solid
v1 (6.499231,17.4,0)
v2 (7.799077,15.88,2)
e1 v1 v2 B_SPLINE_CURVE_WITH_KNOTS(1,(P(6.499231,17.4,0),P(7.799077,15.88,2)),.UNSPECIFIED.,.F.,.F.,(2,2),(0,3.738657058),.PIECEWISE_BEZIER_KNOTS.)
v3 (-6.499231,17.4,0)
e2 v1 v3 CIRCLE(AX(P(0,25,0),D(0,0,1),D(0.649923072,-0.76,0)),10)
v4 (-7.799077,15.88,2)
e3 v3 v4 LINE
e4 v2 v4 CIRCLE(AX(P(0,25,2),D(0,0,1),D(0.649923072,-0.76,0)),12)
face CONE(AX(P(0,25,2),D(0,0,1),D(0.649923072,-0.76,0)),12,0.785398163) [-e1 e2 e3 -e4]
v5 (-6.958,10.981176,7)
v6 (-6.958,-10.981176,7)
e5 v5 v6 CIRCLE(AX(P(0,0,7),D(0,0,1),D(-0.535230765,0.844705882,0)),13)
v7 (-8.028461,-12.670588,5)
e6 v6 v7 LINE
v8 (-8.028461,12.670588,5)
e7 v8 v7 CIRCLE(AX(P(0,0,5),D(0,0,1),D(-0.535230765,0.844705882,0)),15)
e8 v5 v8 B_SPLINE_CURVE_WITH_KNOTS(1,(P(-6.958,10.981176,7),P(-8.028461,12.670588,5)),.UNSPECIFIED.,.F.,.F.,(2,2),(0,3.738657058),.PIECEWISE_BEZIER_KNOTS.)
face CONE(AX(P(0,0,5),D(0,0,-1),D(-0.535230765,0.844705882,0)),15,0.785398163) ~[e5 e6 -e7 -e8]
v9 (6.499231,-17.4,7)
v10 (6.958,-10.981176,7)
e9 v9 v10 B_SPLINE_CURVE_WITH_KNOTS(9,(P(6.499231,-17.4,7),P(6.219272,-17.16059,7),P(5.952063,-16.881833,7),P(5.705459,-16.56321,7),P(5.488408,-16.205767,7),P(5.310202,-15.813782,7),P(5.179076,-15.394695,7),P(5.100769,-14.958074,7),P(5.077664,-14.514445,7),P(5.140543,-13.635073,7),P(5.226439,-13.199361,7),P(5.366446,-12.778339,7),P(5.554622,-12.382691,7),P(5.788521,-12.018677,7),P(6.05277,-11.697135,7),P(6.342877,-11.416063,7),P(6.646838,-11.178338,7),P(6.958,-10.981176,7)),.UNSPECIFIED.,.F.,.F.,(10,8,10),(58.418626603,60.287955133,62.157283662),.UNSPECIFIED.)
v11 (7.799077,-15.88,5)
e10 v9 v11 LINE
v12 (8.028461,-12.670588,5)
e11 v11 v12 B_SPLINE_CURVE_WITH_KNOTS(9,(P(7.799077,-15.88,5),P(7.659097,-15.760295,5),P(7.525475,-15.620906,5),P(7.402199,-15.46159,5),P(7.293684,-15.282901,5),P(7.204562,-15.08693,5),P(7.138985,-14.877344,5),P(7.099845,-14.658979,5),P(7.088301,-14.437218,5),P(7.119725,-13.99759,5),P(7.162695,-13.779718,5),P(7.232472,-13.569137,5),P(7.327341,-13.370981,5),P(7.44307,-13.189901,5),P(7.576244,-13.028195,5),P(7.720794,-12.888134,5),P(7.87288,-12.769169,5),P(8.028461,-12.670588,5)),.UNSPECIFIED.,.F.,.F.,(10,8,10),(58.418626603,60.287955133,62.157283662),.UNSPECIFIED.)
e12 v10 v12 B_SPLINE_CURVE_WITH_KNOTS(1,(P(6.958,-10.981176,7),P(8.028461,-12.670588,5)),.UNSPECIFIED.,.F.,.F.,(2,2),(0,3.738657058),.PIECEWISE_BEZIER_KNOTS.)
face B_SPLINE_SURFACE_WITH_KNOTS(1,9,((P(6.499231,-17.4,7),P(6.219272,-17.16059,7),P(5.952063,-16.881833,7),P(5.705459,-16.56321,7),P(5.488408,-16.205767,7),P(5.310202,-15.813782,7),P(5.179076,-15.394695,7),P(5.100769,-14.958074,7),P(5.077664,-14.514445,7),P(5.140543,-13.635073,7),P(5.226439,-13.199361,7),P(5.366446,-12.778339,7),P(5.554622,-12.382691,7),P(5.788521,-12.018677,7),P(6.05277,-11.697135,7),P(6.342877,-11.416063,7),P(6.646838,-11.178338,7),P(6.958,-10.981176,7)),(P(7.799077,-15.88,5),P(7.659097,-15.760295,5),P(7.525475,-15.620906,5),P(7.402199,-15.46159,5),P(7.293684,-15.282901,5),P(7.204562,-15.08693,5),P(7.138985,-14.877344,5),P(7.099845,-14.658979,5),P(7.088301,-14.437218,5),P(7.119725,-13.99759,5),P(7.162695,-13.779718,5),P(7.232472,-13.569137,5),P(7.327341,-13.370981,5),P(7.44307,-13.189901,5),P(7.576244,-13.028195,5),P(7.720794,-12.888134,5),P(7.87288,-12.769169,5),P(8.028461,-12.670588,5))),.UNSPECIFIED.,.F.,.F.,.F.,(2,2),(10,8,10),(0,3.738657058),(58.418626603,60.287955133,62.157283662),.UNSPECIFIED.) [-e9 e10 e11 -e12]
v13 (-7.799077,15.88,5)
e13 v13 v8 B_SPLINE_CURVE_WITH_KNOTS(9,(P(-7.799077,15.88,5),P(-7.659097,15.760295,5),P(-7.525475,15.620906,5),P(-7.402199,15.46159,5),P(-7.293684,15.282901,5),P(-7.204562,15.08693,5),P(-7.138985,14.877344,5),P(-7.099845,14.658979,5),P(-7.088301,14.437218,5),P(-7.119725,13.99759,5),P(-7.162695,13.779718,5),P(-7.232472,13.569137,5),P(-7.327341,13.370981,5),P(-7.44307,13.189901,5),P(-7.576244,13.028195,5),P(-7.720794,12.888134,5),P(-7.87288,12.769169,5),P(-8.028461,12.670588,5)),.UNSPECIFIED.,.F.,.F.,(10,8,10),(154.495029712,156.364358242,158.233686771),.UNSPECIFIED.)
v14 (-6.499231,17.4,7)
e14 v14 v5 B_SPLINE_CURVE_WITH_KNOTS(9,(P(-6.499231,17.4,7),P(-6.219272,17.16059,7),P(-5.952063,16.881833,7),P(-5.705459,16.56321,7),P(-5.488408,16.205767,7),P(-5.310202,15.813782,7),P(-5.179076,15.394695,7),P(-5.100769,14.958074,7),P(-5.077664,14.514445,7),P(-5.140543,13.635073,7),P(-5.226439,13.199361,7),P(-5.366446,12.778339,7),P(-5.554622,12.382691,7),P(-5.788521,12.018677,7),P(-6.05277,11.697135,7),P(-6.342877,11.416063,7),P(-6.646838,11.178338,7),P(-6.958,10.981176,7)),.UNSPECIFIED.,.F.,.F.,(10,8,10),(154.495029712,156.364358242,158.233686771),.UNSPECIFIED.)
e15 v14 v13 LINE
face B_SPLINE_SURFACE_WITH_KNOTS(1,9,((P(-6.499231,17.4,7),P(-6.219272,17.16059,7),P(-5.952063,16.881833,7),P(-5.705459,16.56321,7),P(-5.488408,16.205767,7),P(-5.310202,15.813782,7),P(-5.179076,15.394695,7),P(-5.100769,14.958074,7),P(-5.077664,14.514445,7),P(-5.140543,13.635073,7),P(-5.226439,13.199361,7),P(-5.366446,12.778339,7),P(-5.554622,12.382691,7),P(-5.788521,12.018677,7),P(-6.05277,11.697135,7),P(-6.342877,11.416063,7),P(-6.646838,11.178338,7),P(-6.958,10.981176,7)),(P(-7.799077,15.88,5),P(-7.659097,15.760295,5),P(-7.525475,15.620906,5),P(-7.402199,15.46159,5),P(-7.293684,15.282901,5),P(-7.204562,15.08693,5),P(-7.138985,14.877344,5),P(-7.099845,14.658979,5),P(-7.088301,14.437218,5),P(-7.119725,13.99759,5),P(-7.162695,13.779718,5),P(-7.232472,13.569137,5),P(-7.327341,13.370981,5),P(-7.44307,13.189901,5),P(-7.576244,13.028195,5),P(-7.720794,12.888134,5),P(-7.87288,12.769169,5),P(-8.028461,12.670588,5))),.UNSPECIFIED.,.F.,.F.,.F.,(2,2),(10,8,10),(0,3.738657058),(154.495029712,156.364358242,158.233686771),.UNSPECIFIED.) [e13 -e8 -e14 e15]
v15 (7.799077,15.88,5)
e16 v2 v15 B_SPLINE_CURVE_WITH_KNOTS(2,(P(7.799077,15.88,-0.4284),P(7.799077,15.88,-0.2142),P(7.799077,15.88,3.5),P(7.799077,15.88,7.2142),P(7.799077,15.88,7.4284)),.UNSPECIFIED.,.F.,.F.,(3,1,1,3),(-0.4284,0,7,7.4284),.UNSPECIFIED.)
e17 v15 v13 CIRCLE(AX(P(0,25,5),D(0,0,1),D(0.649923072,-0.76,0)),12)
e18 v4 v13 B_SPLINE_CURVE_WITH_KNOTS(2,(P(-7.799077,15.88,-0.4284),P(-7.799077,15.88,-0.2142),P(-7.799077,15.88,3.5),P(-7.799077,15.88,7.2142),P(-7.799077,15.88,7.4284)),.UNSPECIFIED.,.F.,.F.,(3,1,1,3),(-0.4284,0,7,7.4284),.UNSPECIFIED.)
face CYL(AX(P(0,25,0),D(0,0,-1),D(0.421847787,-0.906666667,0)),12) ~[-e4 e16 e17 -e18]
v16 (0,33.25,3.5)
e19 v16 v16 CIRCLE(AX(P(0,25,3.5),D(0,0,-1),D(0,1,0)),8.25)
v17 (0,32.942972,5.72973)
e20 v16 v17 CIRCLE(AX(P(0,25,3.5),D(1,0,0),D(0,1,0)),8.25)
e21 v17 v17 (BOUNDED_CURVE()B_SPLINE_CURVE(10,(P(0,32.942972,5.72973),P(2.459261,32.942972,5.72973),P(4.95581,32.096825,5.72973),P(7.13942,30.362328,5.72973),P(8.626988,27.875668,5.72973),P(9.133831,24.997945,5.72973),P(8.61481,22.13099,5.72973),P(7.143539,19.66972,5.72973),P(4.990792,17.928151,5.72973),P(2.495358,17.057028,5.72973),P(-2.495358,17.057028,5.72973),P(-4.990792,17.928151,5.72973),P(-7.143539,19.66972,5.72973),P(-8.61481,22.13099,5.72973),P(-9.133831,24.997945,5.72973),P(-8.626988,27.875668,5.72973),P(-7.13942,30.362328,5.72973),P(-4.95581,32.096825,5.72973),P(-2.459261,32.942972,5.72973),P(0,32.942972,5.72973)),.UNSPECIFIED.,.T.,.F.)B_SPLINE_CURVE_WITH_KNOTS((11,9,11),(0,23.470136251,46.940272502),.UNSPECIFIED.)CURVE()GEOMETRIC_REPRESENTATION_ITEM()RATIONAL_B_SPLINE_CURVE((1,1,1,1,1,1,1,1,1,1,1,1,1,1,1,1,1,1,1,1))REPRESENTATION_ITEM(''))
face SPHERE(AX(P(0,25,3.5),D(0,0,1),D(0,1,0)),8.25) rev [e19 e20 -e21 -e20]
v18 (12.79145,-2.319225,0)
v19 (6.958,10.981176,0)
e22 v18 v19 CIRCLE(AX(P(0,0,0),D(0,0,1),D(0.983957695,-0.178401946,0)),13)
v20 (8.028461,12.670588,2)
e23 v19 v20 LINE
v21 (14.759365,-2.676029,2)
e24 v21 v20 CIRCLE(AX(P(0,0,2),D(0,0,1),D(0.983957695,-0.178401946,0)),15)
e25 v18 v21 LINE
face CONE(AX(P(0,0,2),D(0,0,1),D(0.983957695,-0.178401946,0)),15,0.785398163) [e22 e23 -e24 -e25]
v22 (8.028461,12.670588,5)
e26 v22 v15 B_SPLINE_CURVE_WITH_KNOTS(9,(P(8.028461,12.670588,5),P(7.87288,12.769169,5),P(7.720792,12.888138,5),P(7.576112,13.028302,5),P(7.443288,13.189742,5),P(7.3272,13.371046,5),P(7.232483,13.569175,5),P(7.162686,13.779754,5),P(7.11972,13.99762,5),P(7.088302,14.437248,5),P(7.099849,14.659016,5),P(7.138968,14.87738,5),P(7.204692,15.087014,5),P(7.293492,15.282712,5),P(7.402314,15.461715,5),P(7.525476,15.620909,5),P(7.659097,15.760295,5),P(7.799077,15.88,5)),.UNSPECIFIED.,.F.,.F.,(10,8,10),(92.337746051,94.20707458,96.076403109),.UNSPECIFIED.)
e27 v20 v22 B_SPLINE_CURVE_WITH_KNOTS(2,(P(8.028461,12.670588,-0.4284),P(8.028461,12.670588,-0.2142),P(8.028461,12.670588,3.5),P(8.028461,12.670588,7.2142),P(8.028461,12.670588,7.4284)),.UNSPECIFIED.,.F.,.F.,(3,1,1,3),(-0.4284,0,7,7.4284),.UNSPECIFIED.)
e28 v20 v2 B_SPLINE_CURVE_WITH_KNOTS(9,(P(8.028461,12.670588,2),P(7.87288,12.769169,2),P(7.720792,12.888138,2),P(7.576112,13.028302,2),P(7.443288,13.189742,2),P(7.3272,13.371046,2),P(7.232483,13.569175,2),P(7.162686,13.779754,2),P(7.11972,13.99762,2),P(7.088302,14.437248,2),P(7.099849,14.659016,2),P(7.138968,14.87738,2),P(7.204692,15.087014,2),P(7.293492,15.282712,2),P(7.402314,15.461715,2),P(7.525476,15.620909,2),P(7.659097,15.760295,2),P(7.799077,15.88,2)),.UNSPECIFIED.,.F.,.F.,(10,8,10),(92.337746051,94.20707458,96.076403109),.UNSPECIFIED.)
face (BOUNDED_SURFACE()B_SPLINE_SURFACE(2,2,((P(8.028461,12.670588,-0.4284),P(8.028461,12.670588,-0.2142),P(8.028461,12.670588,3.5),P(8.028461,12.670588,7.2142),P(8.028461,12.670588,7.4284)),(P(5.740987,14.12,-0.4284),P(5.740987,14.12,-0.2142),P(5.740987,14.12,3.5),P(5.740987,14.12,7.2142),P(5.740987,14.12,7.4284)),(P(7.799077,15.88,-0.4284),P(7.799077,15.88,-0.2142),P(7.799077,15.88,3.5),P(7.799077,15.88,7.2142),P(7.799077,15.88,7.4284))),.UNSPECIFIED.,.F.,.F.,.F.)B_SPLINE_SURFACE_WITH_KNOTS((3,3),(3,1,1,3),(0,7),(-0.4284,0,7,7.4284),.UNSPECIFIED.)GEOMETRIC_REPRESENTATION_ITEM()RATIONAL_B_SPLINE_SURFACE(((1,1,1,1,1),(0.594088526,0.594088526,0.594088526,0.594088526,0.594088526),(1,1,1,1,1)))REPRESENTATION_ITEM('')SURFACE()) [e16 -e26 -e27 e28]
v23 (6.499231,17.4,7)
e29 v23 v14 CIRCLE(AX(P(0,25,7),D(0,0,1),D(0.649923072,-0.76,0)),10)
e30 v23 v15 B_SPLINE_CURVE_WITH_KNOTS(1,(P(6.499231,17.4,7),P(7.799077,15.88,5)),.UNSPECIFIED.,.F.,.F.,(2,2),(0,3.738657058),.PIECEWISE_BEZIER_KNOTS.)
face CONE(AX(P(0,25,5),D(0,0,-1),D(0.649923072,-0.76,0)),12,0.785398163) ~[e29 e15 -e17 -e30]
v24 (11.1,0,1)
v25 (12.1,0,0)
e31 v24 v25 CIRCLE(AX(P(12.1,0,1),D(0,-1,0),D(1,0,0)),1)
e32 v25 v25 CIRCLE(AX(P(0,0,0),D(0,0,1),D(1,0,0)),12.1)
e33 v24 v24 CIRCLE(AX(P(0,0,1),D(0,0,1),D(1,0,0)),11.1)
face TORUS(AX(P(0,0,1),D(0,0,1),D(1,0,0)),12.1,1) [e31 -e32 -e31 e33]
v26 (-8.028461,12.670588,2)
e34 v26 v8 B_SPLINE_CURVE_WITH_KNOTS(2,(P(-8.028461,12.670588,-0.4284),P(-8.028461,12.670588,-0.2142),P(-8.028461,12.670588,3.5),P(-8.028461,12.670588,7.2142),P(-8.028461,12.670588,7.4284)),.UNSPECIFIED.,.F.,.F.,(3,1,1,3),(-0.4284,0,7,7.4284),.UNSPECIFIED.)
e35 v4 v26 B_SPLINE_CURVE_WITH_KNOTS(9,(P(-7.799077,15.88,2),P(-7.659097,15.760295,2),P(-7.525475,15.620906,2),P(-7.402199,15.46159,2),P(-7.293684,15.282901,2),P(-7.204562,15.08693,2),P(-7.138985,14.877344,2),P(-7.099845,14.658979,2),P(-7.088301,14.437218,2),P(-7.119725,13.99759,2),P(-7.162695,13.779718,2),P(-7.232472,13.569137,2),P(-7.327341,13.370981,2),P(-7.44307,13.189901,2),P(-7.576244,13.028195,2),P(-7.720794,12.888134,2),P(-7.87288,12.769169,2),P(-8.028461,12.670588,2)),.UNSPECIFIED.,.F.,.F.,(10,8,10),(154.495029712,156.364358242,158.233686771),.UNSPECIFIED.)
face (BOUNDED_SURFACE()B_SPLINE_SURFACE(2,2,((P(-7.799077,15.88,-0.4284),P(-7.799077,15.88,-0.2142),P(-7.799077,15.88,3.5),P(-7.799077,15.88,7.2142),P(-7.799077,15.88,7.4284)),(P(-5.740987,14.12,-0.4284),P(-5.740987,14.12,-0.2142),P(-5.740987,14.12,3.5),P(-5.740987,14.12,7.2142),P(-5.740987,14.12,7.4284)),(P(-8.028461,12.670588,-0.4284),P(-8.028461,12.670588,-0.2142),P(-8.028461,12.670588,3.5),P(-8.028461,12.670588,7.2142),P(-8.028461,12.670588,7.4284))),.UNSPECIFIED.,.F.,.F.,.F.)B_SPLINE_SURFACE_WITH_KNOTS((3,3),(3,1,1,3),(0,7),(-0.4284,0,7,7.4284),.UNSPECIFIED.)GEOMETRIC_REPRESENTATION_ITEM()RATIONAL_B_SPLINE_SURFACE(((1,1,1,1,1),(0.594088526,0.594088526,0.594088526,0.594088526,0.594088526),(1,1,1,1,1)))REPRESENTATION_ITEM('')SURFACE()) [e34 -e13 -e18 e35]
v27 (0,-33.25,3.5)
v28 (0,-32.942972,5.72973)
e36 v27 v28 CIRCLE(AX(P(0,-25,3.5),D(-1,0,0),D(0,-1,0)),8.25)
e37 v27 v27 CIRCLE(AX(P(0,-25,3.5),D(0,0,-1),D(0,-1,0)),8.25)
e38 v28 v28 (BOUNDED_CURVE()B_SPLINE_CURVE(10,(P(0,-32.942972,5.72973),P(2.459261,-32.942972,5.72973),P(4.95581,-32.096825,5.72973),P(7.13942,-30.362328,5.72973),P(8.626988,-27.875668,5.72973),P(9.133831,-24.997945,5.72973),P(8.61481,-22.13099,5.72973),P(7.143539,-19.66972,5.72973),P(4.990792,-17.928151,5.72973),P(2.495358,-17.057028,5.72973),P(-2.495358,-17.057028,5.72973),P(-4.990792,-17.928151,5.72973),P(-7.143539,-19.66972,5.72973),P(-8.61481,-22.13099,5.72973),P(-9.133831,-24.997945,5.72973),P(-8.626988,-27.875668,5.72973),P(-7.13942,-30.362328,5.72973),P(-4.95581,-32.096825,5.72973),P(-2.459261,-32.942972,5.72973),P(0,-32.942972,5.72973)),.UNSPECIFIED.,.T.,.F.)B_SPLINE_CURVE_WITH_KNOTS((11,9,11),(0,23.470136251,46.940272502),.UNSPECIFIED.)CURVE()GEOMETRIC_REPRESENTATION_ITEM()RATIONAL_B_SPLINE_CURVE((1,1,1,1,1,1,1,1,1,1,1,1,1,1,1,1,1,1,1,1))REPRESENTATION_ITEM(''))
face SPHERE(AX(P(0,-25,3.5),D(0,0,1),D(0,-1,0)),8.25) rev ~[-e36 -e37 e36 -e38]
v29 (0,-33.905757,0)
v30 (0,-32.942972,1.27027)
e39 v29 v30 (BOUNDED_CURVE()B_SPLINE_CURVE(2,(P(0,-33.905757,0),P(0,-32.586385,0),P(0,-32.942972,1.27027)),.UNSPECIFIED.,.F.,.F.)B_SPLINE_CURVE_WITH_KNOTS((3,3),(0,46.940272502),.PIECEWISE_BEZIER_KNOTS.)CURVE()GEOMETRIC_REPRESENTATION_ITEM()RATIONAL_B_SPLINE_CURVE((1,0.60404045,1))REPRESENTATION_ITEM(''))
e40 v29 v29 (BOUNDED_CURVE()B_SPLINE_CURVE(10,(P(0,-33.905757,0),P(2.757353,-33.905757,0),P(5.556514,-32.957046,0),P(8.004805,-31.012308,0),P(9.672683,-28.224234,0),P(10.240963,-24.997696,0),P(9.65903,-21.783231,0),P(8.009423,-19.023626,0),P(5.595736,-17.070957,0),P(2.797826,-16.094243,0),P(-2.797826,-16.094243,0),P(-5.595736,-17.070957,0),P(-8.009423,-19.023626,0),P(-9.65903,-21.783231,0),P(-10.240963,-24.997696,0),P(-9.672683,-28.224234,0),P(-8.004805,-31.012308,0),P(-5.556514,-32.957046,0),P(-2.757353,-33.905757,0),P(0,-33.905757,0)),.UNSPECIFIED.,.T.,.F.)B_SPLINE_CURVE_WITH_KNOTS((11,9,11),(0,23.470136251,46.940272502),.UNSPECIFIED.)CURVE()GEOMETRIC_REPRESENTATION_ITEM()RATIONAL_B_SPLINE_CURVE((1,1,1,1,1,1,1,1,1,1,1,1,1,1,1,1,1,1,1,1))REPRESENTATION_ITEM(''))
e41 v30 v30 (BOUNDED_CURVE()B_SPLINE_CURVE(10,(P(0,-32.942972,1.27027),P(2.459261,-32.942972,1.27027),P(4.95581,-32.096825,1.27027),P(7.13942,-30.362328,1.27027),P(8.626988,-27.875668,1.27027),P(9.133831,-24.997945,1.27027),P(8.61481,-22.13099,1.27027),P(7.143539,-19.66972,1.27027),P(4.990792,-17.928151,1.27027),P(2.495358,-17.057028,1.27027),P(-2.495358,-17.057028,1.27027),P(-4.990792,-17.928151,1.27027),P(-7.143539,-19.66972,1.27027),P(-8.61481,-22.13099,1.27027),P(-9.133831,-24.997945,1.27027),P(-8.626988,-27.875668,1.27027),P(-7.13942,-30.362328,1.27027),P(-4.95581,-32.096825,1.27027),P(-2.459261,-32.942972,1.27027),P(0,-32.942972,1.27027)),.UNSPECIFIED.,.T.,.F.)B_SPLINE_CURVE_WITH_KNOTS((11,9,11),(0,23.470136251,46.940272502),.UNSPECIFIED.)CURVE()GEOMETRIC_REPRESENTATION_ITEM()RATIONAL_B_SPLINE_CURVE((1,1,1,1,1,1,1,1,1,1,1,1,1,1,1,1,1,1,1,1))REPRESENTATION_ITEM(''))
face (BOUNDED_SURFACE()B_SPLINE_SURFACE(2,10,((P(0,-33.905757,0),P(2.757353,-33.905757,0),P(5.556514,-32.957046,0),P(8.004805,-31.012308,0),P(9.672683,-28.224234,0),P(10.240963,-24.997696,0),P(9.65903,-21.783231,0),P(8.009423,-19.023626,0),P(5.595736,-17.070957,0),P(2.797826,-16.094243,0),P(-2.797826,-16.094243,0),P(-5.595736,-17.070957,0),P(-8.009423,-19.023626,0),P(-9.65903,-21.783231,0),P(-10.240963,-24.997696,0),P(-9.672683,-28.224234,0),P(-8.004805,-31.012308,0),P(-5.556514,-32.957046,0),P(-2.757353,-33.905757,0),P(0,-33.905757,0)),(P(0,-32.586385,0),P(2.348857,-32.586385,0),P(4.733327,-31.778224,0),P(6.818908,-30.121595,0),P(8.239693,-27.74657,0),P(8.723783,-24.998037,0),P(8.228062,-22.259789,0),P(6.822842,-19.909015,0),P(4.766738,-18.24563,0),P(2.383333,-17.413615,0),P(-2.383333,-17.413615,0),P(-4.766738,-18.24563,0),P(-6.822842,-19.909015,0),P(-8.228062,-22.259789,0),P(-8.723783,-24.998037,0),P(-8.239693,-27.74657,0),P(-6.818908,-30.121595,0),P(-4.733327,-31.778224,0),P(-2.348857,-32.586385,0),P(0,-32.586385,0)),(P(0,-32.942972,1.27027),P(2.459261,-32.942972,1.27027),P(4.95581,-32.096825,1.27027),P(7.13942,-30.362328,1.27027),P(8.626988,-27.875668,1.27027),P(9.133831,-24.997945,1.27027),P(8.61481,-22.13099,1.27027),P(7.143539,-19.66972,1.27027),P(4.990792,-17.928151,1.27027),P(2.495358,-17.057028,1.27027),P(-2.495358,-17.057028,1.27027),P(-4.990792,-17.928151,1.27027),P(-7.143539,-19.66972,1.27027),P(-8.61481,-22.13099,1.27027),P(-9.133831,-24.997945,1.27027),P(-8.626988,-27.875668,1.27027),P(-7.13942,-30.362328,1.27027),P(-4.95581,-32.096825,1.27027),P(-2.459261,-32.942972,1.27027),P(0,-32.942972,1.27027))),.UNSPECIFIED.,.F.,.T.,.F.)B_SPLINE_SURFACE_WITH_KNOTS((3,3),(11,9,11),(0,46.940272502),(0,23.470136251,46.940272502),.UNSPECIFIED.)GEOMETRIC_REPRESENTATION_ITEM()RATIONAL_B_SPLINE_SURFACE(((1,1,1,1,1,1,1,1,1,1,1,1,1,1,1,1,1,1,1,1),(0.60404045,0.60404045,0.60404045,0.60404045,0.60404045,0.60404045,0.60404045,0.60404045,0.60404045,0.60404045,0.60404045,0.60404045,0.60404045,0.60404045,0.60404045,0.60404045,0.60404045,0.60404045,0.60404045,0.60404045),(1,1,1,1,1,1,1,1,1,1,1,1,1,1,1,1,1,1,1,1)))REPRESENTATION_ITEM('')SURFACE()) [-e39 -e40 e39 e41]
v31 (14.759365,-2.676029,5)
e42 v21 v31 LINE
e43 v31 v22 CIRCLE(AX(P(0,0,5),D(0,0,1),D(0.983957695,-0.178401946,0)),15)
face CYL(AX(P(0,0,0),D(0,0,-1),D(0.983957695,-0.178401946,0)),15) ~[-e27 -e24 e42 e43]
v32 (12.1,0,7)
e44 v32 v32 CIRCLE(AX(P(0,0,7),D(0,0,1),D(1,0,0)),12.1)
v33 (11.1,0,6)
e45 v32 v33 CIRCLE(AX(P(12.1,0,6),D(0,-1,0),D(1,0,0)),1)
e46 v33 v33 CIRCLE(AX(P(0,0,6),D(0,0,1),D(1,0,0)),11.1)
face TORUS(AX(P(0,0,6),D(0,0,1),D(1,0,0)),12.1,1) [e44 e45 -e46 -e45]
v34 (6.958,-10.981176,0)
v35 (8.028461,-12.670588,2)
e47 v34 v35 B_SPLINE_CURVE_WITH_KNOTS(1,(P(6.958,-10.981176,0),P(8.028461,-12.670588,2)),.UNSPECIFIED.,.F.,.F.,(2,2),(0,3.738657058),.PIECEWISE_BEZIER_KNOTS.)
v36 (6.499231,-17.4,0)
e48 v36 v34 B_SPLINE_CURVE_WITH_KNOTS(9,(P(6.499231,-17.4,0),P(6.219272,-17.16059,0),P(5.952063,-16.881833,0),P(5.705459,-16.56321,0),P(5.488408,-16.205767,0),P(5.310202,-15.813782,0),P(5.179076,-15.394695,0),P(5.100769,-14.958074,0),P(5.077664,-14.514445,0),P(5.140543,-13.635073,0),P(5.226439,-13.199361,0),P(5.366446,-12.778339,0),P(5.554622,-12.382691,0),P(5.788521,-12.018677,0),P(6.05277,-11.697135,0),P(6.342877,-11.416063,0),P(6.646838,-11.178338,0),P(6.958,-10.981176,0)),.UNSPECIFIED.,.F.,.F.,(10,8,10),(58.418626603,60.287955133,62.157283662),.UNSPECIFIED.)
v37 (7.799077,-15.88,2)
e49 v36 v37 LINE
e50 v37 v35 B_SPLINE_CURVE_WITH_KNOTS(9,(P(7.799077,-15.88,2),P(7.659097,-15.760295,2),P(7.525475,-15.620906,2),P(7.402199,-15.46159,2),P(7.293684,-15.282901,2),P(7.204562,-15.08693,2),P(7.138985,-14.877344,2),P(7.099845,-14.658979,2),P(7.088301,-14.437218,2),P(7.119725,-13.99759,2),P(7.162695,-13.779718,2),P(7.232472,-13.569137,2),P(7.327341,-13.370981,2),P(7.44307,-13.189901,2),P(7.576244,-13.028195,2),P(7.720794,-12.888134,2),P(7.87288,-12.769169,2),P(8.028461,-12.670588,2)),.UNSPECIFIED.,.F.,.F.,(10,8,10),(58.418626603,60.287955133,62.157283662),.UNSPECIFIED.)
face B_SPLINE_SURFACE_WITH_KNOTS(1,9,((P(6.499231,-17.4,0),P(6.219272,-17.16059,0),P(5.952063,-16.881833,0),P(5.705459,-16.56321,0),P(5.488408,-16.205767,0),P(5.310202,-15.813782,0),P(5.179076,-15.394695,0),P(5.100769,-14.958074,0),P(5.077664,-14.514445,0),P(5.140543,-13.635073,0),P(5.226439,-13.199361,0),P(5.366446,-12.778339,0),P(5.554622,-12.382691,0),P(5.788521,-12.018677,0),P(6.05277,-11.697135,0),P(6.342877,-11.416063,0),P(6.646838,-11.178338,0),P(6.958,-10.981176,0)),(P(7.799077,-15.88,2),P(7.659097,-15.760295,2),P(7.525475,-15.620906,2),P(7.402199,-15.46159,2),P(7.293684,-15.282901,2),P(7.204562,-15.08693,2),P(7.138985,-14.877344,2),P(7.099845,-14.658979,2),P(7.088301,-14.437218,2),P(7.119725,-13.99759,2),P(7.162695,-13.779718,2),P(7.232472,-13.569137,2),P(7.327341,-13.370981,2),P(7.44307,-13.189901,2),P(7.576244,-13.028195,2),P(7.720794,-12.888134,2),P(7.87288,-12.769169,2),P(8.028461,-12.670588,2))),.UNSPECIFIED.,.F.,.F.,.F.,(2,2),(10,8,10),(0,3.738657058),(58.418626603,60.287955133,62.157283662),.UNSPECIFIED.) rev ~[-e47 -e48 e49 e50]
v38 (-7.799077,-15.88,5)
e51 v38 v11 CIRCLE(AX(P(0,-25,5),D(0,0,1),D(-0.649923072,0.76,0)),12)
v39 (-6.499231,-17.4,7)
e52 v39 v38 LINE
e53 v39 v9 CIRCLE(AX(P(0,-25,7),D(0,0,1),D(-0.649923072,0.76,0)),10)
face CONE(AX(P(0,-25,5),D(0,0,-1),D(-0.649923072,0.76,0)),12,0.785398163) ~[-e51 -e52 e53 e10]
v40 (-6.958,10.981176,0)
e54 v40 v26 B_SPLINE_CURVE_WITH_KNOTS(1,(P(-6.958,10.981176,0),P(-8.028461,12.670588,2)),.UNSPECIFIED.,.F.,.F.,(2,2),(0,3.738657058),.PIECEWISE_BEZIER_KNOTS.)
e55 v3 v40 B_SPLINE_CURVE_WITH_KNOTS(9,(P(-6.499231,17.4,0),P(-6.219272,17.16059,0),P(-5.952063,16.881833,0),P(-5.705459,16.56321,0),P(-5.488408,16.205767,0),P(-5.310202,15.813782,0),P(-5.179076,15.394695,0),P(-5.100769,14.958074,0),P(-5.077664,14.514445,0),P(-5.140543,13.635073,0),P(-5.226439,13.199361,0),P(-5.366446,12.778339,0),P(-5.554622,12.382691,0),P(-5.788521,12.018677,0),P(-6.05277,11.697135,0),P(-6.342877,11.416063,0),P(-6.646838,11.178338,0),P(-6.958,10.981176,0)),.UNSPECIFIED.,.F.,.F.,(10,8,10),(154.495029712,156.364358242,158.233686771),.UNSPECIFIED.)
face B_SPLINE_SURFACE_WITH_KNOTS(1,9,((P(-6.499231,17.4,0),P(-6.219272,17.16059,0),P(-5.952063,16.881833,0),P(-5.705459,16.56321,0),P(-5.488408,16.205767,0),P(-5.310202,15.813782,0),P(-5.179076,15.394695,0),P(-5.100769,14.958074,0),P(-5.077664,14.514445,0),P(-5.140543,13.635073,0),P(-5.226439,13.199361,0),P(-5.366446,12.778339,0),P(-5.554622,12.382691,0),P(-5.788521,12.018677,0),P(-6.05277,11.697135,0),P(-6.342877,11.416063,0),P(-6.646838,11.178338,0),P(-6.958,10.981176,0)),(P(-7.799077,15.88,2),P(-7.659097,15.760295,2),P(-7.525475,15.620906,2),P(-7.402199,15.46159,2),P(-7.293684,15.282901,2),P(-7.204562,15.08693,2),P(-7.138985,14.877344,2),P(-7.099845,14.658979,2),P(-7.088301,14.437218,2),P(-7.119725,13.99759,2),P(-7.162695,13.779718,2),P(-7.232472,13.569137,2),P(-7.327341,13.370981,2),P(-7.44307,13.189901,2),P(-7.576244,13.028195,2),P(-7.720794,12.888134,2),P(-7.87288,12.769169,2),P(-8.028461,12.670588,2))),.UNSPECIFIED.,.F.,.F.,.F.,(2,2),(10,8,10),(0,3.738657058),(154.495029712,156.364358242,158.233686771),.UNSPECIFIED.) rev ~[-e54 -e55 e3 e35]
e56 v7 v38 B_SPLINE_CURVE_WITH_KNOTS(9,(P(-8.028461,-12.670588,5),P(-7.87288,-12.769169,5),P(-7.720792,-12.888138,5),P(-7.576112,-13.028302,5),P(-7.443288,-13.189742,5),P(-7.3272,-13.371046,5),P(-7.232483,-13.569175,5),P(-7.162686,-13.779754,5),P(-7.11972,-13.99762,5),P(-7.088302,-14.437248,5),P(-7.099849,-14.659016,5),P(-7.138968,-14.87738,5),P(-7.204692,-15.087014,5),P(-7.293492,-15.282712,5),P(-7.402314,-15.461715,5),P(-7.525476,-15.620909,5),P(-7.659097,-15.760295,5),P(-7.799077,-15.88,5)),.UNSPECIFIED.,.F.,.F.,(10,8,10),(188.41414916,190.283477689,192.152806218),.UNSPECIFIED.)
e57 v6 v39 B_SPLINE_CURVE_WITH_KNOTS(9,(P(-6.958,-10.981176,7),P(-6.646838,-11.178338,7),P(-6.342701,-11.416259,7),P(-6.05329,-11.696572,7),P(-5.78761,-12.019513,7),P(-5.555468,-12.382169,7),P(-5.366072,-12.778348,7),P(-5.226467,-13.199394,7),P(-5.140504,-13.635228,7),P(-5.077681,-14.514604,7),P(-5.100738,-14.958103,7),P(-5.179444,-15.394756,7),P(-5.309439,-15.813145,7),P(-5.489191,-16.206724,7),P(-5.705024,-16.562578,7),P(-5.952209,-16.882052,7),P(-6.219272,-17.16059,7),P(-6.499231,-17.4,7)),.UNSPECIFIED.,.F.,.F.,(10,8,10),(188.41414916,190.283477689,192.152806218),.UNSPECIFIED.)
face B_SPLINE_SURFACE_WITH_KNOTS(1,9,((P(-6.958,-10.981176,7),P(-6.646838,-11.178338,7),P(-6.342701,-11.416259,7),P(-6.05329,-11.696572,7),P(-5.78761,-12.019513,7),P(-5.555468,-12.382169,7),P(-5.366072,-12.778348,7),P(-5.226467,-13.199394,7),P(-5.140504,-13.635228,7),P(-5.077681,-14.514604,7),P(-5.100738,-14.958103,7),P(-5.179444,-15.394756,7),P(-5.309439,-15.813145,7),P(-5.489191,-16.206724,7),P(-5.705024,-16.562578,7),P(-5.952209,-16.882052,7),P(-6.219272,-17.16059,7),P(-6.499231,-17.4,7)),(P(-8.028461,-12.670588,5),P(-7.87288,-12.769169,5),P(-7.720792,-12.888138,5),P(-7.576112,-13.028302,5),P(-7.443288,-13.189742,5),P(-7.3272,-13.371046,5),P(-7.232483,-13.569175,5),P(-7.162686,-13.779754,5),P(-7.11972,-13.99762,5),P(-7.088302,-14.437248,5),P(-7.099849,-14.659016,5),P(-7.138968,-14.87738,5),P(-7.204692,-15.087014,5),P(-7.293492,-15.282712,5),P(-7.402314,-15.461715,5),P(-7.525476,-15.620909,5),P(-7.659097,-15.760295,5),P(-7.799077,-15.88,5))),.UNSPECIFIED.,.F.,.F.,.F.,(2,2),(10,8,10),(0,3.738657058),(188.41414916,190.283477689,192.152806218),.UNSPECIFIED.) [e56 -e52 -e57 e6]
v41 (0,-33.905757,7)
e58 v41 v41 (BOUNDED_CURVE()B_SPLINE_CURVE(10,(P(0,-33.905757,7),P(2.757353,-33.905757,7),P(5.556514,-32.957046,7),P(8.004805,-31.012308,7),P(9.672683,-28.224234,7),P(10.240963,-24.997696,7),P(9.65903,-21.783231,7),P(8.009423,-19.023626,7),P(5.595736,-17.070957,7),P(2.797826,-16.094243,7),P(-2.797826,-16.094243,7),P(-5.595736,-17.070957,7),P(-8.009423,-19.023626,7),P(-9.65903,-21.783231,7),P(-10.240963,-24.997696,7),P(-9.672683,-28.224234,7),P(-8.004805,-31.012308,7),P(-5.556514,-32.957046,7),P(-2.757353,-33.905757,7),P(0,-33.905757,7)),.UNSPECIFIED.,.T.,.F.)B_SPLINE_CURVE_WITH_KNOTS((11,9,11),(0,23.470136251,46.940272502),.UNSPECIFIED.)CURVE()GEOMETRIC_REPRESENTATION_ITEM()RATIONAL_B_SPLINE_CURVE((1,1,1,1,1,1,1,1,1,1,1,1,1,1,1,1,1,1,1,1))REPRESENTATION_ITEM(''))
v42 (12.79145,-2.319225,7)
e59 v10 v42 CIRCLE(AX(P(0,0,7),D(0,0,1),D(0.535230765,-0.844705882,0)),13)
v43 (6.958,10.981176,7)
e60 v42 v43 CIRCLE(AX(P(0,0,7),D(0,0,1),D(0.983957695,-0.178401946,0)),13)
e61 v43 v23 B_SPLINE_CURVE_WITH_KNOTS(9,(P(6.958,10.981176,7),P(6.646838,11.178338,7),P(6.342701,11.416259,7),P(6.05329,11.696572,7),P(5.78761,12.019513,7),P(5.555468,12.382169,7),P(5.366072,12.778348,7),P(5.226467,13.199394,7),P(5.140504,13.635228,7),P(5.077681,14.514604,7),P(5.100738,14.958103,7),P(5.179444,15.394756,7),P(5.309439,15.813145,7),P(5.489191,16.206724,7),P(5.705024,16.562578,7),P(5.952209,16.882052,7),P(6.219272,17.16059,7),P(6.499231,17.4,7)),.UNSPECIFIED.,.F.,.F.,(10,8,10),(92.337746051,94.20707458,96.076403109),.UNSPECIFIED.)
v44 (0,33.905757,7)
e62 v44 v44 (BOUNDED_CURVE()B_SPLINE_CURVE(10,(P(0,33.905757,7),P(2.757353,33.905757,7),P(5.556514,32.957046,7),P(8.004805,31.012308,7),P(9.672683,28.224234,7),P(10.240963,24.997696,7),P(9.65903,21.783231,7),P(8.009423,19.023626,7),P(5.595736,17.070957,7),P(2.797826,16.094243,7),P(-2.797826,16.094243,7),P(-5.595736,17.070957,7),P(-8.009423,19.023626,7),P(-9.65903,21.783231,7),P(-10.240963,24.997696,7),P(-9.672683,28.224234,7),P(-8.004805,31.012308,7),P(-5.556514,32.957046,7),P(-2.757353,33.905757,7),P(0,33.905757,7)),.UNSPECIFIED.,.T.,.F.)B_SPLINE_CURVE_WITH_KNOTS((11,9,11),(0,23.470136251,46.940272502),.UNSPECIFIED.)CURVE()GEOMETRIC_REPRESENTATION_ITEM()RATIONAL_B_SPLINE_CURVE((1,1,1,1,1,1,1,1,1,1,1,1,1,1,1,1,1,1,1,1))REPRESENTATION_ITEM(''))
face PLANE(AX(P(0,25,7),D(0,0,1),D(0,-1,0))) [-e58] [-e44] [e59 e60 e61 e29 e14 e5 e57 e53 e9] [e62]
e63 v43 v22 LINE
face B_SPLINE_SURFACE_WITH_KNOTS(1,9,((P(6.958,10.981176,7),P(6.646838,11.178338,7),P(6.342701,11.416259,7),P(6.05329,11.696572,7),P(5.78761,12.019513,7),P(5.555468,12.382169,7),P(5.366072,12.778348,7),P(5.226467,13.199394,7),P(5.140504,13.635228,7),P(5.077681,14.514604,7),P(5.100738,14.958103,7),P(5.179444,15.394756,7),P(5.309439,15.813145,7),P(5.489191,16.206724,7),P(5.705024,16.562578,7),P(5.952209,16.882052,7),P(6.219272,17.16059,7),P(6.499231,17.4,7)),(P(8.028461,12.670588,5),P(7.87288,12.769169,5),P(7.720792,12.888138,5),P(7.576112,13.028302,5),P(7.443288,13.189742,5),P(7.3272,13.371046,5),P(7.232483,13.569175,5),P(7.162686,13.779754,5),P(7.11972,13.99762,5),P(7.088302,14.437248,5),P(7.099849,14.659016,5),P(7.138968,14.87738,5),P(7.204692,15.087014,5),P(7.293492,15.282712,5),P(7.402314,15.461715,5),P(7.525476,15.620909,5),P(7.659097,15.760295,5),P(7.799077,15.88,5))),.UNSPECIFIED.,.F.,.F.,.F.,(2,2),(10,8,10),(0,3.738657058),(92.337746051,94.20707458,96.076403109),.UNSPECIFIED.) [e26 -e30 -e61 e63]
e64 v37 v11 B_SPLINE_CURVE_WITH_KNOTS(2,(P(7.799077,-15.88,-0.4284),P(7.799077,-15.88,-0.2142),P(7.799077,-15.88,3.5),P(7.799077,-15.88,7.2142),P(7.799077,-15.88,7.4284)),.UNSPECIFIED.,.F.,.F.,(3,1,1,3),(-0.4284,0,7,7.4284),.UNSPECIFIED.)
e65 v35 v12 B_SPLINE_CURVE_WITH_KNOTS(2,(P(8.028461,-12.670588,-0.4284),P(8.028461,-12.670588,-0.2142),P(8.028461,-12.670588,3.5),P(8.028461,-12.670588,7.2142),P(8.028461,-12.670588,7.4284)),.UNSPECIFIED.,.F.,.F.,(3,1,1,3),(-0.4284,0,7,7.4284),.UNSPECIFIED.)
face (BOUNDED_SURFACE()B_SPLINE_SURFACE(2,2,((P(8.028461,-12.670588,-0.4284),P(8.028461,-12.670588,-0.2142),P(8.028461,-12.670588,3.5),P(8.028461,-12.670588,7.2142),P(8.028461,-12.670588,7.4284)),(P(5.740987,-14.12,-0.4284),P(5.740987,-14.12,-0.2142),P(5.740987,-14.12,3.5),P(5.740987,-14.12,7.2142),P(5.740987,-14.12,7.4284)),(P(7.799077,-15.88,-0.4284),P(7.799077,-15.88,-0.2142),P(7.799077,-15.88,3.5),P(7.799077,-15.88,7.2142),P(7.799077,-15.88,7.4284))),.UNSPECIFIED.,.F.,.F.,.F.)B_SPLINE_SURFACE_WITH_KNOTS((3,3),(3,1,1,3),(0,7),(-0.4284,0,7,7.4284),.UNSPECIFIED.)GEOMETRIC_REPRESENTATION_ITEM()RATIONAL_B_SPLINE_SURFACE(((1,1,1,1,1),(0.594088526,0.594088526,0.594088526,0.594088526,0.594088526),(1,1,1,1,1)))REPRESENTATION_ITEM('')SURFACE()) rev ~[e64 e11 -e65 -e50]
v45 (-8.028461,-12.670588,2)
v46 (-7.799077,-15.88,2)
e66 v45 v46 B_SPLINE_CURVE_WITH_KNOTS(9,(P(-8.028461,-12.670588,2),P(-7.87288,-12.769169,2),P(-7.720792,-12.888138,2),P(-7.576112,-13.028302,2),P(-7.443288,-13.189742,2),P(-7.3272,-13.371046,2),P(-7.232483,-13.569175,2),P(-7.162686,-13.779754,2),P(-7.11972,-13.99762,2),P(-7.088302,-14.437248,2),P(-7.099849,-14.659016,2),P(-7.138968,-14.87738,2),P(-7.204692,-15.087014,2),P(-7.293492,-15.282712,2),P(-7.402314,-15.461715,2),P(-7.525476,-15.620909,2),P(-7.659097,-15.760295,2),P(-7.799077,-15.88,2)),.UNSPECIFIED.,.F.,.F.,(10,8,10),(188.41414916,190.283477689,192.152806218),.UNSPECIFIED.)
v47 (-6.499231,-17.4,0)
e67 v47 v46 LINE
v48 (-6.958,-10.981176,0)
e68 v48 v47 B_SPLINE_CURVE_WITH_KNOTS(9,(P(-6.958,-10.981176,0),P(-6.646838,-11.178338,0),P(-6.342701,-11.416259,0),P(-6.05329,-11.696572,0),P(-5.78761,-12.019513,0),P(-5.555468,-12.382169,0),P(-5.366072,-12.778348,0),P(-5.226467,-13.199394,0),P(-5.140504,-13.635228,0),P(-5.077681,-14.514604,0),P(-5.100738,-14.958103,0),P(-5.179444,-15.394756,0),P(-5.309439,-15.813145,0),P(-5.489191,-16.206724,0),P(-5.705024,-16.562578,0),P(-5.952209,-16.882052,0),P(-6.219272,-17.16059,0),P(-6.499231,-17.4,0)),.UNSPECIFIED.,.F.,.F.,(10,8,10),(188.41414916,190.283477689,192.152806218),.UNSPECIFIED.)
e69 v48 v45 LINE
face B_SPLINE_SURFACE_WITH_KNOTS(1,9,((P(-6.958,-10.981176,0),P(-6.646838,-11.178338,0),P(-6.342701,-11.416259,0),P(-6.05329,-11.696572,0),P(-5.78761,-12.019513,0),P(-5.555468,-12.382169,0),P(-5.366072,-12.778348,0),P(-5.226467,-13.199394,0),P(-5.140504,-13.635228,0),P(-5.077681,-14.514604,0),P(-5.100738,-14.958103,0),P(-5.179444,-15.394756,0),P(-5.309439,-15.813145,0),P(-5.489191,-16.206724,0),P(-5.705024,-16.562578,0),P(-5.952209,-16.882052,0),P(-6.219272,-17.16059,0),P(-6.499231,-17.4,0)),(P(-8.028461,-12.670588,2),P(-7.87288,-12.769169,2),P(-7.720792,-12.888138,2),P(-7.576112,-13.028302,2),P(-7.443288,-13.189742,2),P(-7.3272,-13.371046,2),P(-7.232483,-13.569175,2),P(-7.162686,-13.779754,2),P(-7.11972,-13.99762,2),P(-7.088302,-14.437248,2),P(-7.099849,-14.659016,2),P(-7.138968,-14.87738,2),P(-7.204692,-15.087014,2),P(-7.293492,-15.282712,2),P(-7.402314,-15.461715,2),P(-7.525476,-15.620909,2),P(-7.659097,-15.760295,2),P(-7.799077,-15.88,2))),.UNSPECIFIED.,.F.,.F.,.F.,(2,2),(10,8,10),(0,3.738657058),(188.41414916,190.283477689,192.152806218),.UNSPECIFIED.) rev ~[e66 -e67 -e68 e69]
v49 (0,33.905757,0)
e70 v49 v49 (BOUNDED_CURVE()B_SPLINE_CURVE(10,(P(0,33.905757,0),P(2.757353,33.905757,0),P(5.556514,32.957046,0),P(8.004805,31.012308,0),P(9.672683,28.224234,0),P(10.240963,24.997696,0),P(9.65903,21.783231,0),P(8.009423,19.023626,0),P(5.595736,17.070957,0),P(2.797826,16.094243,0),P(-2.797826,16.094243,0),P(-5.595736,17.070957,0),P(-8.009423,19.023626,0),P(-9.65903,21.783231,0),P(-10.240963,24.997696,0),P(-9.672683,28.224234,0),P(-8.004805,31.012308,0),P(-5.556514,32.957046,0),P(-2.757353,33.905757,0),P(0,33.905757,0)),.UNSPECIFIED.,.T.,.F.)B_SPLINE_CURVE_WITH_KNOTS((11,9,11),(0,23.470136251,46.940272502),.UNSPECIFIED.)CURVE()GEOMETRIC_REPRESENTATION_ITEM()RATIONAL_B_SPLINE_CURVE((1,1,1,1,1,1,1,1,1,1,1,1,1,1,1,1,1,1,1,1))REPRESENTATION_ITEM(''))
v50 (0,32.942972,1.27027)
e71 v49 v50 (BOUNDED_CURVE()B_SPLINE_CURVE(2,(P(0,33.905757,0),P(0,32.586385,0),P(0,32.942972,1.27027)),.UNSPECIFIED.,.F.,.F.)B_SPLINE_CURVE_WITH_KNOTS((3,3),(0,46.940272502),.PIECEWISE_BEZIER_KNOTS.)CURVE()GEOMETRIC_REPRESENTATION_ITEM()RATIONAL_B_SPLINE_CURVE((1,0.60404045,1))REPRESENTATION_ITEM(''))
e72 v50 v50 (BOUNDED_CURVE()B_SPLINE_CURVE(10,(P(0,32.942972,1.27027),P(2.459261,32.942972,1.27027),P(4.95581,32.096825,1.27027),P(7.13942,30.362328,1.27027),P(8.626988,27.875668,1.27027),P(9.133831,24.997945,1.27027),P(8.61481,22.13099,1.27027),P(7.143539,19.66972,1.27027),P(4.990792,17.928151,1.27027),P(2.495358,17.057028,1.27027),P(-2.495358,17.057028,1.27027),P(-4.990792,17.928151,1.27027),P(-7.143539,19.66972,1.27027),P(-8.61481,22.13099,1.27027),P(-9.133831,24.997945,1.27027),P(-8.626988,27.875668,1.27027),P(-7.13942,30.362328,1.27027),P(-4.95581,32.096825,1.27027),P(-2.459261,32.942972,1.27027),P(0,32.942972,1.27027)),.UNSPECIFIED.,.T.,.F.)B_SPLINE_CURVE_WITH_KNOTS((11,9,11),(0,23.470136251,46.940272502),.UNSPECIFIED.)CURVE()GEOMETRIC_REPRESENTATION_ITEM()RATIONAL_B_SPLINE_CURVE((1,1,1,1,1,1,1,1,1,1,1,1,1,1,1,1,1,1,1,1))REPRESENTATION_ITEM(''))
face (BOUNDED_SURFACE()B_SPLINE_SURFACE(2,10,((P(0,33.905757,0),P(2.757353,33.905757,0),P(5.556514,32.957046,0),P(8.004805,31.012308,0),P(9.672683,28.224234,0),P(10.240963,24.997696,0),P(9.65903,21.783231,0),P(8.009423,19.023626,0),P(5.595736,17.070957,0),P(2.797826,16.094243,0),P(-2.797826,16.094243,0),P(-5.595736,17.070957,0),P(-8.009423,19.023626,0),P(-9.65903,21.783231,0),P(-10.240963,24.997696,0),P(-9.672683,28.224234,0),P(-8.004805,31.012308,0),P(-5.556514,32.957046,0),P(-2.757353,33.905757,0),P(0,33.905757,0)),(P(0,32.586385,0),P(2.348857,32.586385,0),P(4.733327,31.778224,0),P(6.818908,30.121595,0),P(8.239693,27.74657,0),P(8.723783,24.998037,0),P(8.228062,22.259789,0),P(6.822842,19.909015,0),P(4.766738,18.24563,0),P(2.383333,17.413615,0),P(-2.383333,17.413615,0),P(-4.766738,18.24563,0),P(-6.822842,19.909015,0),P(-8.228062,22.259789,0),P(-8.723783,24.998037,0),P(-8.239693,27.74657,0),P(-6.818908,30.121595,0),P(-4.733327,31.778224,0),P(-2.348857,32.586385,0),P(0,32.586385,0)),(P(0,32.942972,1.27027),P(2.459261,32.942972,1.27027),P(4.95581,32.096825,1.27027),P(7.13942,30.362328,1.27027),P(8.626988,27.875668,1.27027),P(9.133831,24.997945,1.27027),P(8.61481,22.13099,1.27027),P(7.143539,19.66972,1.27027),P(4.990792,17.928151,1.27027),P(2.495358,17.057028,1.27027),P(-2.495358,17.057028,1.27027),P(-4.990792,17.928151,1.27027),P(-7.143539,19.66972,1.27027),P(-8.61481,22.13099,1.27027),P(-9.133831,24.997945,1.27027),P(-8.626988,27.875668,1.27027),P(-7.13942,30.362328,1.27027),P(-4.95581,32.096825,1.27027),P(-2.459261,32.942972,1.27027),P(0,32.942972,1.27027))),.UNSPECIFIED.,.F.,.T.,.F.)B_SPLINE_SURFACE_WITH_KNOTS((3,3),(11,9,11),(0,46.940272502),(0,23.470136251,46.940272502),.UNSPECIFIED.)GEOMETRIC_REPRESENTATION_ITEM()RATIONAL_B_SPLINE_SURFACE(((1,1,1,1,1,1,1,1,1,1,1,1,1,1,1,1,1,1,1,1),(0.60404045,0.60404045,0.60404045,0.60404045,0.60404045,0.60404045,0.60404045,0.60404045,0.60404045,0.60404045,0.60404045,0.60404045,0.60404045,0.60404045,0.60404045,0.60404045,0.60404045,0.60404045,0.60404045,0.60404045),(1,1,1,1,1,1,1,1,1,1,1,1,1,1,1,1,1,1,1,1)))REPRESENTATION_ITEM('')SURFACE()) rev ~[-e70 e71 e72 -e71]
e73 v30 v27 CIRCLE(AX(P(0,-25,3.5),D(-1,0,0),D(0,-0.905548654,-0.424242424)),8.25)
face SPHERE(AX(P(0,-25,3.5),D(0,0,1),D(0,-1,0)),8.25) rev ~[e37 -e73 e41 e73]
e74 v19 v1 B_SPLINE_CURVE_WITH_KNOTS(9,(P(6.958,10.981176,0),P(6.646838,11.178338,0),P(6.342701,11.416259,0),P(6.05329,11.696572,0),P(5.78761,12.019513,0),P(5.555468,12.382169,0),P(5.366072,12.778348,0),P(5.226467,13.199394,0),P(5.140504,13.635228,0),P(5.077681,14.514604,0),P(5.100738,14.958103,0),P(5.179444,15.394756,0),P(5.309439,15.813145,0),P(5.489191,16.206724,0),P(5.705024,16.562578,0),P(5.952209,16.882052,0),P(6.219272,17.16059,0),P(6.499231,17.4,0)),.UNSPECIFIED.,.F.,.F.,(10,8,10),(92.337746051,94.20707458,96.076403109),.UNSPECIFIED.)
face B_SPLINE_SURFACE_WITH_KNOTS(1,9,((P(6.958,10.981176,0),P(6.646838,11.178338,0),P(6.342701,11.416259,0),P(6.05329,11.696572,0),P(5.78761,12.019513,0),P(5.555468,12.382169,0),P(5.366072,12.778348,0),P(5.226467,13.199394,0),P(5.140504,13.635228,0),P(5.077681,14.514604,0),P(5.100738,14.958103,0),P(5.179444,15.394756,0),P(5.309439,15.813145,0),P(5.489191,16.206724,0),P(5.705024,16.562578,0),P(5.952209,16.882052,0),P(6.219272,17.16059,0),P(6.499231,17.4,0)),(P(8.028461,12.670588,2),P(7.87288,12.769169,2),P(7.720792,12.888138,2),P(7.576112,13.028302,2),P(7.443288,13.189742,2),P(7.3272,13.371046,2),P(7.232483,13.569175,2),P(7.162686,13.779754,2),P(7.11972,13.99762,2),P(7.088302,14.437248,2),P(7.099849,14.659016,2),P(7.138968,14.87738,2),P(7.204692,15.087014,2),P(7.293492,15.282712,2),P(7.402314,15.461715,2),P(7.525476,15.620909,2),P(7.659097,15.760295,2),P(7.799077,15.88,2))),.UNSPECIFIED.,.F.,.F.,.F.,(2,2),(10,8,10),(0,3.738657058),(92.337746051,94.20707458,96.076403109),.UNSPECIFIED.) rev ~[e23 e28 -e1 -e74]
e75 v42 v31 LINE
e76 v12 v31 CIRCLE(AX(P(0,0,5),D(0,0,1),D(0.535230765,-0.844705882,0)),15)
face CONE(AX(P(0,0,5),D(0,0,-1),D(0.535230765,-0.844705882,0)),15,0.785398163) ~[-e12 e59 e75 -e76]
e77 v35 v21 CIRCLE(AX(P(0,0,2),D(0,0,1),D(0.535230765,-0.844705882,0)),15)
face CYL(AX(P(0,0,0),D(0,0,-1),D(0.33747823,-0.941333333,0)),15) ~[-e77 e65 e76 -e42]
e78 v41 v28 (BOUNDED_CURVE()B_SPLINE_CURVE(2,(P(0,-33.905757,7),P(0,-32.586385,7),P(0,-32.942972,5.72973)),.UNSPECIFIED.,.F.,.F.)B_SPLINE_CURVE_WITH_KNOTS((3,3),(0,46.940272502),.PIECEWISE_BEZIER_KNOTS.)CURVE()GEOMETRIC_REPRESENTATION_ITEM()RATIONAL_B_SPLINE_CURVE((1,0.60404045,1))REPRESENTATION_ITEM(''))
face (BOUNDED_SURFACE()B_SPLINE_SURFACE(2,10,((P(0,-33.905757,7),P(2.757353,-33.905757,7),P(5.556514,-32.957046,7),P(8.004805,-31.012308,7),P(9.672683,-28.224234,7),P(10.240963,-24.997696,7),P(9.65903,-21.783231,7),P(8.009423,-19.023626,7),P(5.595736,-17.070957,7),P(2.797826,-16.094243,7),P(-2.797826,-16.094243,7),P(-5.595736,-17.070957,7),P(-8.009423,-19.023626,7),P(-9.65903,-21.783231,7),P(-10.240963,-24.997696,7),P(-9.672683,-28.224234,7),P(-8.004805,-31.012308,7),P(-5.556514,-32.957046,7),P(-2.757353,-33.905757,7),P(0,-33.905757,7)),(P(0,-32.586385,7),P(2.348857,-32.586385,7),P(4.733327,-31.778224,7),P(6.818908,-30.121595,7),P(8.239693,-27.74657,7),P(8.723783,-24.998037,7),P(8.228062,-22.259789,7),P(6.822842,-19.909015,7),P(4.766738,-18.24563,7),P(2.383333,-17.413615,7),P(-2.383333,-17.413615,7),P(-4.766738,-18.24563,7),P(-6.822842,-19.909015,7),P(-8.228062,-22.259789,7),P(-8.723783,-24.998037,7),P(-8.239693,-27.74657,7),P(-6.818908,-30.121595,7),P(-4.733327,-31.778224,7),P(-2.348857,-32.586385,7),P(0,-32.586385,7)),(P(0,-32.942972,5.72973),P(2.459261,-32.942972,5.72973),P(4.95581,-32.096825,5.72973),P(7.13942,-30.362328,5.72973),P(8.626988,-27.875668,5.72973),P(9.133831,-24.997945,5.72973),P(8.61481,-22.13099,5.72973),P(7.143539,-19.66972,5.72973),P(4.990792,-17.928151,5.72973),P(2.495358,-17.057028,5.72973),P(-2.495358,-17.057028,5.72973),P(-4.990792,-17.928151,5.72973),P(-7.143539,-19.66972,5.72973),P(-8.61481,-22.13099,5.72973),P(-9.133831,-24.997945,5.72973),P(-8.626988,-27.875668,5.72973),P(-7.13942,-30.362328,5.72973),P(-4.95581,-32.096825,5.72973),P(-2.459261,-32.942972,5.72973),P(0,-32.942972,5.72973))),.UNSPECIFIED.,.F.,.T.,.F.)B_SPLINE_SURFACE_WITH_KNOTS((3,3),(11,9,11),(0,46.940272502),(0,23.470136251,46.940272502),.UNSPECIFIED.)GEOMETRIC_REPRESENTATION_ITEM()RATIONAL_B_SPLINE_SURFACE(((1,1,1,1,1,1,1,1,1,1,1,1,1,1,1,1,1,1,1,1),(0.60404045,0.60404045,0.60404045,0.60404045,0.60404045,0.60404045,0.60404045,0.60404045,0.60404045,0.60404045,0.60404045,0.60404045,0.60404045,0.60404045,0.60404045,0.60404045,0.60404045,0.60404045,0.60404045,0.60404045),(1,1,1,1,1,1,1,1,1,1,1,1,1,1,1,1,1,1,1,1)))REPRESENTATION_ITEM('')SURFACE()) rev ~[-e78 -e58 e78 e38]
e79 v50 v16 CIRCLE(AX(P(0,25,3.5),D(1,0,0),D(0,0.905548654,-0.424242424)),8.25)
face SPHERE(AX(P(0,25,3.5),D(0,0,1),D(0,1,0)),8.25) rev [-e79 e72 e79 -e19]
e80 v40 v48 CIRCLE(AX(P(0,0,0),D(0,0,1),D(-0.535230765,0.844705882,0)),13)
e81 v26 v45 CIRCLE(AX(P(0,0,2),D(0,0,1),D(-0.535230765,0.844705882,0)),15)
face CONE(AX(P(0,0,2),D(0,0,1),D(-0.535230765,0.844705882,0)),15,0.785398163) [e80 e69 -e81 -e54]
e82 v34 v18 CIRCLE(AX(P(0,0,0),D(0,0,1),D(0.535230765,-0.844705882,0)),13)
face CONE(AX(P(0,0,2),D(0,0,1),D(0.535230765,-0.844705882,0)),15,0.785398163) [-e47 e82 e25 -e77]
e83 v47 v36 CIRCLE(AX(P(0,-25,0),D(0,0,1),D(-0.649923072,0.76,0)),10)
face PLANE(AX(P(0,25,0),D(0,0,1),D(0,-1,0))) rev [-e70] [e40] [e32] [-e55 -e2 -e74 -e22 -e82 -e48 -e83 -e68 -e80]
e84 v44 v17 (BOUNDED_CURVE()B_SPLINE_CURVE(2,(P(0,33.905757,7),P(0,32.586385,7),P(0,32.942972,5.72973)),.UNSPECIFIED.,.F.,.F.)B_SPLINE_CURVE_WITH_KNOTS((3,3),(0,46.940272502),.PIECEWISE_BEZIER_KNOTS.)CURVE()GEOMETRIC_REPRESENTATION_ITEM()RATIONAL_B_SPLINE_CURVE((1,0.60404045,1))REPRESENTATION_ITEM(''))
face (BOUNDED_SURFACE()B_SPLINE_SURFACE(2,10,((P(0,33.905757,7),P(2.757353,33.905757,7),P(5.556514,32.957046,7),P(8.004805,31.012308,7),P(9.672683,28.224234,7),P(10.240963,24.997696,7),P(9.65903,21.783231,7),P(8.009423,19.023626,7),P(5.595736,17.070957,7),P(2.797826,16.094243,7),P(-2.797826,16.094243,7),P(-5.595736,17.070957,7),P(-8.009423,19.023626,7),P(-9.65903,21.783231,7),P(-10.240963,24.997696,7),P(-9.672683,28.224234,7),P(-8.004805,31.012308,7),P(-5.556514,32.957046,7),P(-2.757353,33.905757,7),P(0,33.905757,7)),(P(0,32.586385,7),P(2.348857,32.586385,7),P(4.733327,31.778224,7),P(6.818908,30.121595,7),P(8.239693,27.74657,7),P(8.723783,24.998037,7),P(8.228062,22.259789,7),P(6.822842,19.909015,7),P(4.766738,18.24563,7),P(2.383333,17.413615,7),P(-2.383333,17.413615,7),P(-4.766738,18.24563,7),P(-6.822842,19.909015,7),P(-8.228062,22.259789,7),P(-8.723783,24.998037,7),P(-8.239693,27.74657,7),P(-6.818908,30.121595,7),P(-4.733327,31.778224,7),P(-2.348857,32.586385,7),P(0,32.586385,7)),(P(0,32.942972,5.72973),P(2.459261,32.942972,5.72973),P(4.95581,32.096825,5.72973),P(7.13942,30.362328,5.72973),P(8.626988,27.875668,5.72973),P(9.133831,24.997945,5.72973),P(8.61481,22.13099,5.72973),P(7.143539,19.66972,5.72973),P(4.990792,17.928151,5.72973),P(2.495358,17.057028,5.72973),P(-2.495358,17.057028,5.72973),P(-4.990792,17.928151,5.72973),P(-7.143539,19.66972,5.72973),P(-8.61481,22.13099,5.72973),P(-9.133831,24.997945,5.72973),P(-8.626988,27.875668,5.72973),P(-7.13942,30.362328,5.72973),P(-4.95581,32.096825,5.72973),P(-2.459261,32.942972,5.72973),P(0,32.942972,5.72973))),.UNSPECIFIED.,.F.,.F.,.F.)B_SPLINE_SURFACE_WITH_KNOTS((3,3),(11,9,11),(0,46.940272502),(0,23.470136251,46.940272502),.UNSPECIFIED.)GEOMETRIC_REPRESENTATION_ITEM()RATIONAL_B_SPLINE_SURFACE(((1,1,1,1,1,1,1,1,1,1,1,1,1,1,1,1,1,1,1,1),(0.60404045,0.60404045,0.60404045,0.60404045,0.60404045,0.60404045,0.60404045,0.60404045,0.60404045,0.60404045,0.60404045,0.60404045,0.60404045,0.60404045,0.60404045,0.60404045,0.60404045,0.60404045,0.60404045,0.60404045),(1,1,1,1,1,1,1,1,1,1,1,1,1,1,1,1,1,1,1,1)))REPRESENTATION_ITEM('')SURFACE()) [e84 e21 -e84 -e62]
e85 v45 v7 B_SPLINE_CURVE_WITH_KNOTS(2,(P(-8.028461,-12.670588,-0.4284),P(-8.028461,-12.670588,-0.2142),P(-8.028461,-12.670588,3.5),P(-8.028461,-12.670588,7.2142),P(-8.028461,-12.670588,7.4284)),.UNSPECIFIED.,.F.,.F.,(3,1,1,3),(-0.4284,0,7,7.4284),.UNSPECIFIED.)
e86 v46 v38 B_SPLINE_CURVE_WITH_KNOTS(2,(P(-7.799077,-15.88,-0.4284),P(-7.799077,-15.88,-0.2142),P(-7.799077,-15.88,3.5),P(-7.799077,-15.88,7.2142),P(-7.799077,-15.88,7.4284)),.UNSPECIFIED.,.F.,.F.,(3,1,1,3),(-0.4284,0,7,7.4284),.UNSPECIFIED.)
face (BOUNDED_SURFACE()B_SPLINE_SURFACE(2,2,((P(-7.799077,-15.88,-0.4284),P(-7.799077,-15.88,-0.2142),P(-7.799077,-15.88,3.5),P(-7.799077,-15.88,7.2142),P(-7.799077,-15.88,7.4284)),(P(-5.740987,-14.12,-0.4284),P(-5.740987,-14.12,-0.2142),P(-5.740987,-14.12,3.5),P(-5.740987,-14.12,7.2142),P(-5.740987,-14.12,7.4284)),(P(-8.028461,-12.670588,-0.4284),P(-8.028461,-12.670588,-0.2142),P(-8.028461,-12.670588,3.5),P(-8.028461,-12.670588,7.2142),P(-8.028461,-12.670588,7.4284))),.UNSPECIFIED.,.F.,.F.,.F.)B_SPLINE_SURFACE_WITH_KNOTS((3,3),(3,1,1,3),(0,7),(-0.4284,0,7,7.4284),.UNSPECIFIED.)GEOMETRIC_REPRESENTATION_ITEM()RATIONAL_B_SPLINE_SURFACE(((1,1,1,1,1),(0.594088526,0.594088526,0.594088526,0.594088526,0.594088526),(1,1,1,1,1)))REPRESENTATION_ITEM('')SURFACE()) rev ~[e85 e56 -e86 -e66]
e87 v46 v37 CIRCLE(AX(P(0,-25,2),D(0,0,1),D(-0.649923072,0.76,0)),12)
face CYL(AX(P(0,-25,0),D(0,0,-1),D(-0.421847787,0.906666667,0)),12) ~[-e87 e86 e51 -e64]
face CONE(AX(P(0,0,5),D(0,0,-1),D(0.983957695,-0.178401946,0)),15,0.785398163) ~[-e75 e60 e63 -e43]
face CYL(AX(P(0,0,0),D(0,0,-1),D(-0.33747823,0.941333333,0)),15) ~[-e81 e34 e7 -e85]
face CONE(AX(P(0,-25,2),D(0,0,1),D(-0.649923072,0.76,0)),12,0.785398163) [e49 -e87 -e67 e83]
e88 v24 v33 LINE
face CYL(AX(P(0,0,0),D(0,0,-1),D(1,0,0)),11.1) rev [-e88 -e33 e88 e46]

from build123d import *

# Parameters (mm, degrees)
F0_R     = 8.25
F0_R_2   = 11.1
F1_DEPTH = 7
F2_R     = 2
F3_SIZE  = 2
F9_R     = 1


# Not quite as in the source:
# - a pattern or mirror of a feature is missing from the dataset's text; its kind, count and spacing are read off the source's solid
# - a feature names something its author has since deleted; it is built from what else it names


with BuildPart() as f1:
    # F0 (on Top) → F1 (new body)
    with BuildSketch(Plane.XY):
        with BuildLine():
            ThreePointArc((14.7593654246, -2.6760291972), (12.9903810568, 7.5), (5.0621734463, 14.12))
            ThreePointArc((5.0621734463, 14.12), (0, 37), (-5.0621734463, 14.12))
            ThreePointArc((-5.0621734463, 14.12), (-15, 0), (-5.0621734463, -14.12))
            ThreePointArc((-5.0621734463, -14.12), (0, -37), (5.0621734463, -14.12))
            ThreePointArc((5.0621734463, -14.12), (11.4439708028, -9.6971919783), (14.7593654246, -2.6760291972))
        make_face()
        with Locations((0, -25)):
            Circle(F0_R, mode=Mode.SUBTRACT)
        Circle(F0_R_2, mode=Mode.SUBTRACT)
        with Locations((0, 25)):
            Circle(F0_R, mode=Mode.SUBTRACT)
    extrude(amount=F1_DEPTH)

    # F2
    f2_edges = [f1.edges().sort_by_distance(p)[0] for p in [
        (5.062173, -14.12, 3.5),
        (5.062173, 14.12, 3.5),
        (-5.062173, 14.12, 3.5),
        (-5.062173, -14.12, 3.5),
    ]]
    fillet(f2_edges, radius=F2_R)

    # F3
    f3_edges = [f1.edges().sort_by_distance(p)[0] for p in [
        (0, -37, 7),
        (0, -37, 0),
        (15, 0, 7),
        (15, 0, 0),
        (7.104012, 14.217419, 7),
        (7.104012, -14.217419, 7),
        (0, 37, 7),
        (-7.104012, 14.217419, 7),
        (-7.104012, -14.217419, 7),
        (-15, 0, 7),
        (7.104012, 14.217419, 0),
        (7.104012, -14.217419, 0),
        (0, 37, 0),
        (-7.104012, -14.217419, 0),
        (-7.104012, 14.217419, 0),
        (-15, 0, 0),
    ]]
    chamfer(f3_edges, length=F3_SIZE)

    # F7 (on 3pt) → F8 (revolve)
    with BuildSketch(Plane.YZ):
        with BuildLine():
            Line((-32.4707763987, 7), (-33.25, 7))
            Line((-33.25, 7), (-33.25, 3.5))
            ThreePointArc((-33.25, 3.5), (-33.0528381733, 5.2928461605), (-32.4707763987, 7))
        make_face()
        with BuildLine():
            ThreePointArc((-32.4707763987, 0), (-33.0528381733, 1.7071538395), (-33.25, 3.5))
            Line((-33.25, 3.5), (-33.25, 0))
            Line((-33.25, 0), (-32.4707763987, 0))
        make_face()
    f8 = revolve(axis=Axis((0, -25, 3.5), (0, 0, 1)))

    # F8_copies: F8 across plane
    add(f8.mirror(Plane.ZX))

    # F9
    f9_edges = [f1.edges().sort_by_distance(p)[0] for p in [
        (0, -17.529224, 7),
        (0, -17.529224, 0),
        (-11.1, 0, 0),
        (-11.1, 0, 7),
        (0, 17.529224, 7),
        (0, 17.529224, 0),
    ]]
    fillet(f9_edges, radius=F9_R)


solid = f1.part
